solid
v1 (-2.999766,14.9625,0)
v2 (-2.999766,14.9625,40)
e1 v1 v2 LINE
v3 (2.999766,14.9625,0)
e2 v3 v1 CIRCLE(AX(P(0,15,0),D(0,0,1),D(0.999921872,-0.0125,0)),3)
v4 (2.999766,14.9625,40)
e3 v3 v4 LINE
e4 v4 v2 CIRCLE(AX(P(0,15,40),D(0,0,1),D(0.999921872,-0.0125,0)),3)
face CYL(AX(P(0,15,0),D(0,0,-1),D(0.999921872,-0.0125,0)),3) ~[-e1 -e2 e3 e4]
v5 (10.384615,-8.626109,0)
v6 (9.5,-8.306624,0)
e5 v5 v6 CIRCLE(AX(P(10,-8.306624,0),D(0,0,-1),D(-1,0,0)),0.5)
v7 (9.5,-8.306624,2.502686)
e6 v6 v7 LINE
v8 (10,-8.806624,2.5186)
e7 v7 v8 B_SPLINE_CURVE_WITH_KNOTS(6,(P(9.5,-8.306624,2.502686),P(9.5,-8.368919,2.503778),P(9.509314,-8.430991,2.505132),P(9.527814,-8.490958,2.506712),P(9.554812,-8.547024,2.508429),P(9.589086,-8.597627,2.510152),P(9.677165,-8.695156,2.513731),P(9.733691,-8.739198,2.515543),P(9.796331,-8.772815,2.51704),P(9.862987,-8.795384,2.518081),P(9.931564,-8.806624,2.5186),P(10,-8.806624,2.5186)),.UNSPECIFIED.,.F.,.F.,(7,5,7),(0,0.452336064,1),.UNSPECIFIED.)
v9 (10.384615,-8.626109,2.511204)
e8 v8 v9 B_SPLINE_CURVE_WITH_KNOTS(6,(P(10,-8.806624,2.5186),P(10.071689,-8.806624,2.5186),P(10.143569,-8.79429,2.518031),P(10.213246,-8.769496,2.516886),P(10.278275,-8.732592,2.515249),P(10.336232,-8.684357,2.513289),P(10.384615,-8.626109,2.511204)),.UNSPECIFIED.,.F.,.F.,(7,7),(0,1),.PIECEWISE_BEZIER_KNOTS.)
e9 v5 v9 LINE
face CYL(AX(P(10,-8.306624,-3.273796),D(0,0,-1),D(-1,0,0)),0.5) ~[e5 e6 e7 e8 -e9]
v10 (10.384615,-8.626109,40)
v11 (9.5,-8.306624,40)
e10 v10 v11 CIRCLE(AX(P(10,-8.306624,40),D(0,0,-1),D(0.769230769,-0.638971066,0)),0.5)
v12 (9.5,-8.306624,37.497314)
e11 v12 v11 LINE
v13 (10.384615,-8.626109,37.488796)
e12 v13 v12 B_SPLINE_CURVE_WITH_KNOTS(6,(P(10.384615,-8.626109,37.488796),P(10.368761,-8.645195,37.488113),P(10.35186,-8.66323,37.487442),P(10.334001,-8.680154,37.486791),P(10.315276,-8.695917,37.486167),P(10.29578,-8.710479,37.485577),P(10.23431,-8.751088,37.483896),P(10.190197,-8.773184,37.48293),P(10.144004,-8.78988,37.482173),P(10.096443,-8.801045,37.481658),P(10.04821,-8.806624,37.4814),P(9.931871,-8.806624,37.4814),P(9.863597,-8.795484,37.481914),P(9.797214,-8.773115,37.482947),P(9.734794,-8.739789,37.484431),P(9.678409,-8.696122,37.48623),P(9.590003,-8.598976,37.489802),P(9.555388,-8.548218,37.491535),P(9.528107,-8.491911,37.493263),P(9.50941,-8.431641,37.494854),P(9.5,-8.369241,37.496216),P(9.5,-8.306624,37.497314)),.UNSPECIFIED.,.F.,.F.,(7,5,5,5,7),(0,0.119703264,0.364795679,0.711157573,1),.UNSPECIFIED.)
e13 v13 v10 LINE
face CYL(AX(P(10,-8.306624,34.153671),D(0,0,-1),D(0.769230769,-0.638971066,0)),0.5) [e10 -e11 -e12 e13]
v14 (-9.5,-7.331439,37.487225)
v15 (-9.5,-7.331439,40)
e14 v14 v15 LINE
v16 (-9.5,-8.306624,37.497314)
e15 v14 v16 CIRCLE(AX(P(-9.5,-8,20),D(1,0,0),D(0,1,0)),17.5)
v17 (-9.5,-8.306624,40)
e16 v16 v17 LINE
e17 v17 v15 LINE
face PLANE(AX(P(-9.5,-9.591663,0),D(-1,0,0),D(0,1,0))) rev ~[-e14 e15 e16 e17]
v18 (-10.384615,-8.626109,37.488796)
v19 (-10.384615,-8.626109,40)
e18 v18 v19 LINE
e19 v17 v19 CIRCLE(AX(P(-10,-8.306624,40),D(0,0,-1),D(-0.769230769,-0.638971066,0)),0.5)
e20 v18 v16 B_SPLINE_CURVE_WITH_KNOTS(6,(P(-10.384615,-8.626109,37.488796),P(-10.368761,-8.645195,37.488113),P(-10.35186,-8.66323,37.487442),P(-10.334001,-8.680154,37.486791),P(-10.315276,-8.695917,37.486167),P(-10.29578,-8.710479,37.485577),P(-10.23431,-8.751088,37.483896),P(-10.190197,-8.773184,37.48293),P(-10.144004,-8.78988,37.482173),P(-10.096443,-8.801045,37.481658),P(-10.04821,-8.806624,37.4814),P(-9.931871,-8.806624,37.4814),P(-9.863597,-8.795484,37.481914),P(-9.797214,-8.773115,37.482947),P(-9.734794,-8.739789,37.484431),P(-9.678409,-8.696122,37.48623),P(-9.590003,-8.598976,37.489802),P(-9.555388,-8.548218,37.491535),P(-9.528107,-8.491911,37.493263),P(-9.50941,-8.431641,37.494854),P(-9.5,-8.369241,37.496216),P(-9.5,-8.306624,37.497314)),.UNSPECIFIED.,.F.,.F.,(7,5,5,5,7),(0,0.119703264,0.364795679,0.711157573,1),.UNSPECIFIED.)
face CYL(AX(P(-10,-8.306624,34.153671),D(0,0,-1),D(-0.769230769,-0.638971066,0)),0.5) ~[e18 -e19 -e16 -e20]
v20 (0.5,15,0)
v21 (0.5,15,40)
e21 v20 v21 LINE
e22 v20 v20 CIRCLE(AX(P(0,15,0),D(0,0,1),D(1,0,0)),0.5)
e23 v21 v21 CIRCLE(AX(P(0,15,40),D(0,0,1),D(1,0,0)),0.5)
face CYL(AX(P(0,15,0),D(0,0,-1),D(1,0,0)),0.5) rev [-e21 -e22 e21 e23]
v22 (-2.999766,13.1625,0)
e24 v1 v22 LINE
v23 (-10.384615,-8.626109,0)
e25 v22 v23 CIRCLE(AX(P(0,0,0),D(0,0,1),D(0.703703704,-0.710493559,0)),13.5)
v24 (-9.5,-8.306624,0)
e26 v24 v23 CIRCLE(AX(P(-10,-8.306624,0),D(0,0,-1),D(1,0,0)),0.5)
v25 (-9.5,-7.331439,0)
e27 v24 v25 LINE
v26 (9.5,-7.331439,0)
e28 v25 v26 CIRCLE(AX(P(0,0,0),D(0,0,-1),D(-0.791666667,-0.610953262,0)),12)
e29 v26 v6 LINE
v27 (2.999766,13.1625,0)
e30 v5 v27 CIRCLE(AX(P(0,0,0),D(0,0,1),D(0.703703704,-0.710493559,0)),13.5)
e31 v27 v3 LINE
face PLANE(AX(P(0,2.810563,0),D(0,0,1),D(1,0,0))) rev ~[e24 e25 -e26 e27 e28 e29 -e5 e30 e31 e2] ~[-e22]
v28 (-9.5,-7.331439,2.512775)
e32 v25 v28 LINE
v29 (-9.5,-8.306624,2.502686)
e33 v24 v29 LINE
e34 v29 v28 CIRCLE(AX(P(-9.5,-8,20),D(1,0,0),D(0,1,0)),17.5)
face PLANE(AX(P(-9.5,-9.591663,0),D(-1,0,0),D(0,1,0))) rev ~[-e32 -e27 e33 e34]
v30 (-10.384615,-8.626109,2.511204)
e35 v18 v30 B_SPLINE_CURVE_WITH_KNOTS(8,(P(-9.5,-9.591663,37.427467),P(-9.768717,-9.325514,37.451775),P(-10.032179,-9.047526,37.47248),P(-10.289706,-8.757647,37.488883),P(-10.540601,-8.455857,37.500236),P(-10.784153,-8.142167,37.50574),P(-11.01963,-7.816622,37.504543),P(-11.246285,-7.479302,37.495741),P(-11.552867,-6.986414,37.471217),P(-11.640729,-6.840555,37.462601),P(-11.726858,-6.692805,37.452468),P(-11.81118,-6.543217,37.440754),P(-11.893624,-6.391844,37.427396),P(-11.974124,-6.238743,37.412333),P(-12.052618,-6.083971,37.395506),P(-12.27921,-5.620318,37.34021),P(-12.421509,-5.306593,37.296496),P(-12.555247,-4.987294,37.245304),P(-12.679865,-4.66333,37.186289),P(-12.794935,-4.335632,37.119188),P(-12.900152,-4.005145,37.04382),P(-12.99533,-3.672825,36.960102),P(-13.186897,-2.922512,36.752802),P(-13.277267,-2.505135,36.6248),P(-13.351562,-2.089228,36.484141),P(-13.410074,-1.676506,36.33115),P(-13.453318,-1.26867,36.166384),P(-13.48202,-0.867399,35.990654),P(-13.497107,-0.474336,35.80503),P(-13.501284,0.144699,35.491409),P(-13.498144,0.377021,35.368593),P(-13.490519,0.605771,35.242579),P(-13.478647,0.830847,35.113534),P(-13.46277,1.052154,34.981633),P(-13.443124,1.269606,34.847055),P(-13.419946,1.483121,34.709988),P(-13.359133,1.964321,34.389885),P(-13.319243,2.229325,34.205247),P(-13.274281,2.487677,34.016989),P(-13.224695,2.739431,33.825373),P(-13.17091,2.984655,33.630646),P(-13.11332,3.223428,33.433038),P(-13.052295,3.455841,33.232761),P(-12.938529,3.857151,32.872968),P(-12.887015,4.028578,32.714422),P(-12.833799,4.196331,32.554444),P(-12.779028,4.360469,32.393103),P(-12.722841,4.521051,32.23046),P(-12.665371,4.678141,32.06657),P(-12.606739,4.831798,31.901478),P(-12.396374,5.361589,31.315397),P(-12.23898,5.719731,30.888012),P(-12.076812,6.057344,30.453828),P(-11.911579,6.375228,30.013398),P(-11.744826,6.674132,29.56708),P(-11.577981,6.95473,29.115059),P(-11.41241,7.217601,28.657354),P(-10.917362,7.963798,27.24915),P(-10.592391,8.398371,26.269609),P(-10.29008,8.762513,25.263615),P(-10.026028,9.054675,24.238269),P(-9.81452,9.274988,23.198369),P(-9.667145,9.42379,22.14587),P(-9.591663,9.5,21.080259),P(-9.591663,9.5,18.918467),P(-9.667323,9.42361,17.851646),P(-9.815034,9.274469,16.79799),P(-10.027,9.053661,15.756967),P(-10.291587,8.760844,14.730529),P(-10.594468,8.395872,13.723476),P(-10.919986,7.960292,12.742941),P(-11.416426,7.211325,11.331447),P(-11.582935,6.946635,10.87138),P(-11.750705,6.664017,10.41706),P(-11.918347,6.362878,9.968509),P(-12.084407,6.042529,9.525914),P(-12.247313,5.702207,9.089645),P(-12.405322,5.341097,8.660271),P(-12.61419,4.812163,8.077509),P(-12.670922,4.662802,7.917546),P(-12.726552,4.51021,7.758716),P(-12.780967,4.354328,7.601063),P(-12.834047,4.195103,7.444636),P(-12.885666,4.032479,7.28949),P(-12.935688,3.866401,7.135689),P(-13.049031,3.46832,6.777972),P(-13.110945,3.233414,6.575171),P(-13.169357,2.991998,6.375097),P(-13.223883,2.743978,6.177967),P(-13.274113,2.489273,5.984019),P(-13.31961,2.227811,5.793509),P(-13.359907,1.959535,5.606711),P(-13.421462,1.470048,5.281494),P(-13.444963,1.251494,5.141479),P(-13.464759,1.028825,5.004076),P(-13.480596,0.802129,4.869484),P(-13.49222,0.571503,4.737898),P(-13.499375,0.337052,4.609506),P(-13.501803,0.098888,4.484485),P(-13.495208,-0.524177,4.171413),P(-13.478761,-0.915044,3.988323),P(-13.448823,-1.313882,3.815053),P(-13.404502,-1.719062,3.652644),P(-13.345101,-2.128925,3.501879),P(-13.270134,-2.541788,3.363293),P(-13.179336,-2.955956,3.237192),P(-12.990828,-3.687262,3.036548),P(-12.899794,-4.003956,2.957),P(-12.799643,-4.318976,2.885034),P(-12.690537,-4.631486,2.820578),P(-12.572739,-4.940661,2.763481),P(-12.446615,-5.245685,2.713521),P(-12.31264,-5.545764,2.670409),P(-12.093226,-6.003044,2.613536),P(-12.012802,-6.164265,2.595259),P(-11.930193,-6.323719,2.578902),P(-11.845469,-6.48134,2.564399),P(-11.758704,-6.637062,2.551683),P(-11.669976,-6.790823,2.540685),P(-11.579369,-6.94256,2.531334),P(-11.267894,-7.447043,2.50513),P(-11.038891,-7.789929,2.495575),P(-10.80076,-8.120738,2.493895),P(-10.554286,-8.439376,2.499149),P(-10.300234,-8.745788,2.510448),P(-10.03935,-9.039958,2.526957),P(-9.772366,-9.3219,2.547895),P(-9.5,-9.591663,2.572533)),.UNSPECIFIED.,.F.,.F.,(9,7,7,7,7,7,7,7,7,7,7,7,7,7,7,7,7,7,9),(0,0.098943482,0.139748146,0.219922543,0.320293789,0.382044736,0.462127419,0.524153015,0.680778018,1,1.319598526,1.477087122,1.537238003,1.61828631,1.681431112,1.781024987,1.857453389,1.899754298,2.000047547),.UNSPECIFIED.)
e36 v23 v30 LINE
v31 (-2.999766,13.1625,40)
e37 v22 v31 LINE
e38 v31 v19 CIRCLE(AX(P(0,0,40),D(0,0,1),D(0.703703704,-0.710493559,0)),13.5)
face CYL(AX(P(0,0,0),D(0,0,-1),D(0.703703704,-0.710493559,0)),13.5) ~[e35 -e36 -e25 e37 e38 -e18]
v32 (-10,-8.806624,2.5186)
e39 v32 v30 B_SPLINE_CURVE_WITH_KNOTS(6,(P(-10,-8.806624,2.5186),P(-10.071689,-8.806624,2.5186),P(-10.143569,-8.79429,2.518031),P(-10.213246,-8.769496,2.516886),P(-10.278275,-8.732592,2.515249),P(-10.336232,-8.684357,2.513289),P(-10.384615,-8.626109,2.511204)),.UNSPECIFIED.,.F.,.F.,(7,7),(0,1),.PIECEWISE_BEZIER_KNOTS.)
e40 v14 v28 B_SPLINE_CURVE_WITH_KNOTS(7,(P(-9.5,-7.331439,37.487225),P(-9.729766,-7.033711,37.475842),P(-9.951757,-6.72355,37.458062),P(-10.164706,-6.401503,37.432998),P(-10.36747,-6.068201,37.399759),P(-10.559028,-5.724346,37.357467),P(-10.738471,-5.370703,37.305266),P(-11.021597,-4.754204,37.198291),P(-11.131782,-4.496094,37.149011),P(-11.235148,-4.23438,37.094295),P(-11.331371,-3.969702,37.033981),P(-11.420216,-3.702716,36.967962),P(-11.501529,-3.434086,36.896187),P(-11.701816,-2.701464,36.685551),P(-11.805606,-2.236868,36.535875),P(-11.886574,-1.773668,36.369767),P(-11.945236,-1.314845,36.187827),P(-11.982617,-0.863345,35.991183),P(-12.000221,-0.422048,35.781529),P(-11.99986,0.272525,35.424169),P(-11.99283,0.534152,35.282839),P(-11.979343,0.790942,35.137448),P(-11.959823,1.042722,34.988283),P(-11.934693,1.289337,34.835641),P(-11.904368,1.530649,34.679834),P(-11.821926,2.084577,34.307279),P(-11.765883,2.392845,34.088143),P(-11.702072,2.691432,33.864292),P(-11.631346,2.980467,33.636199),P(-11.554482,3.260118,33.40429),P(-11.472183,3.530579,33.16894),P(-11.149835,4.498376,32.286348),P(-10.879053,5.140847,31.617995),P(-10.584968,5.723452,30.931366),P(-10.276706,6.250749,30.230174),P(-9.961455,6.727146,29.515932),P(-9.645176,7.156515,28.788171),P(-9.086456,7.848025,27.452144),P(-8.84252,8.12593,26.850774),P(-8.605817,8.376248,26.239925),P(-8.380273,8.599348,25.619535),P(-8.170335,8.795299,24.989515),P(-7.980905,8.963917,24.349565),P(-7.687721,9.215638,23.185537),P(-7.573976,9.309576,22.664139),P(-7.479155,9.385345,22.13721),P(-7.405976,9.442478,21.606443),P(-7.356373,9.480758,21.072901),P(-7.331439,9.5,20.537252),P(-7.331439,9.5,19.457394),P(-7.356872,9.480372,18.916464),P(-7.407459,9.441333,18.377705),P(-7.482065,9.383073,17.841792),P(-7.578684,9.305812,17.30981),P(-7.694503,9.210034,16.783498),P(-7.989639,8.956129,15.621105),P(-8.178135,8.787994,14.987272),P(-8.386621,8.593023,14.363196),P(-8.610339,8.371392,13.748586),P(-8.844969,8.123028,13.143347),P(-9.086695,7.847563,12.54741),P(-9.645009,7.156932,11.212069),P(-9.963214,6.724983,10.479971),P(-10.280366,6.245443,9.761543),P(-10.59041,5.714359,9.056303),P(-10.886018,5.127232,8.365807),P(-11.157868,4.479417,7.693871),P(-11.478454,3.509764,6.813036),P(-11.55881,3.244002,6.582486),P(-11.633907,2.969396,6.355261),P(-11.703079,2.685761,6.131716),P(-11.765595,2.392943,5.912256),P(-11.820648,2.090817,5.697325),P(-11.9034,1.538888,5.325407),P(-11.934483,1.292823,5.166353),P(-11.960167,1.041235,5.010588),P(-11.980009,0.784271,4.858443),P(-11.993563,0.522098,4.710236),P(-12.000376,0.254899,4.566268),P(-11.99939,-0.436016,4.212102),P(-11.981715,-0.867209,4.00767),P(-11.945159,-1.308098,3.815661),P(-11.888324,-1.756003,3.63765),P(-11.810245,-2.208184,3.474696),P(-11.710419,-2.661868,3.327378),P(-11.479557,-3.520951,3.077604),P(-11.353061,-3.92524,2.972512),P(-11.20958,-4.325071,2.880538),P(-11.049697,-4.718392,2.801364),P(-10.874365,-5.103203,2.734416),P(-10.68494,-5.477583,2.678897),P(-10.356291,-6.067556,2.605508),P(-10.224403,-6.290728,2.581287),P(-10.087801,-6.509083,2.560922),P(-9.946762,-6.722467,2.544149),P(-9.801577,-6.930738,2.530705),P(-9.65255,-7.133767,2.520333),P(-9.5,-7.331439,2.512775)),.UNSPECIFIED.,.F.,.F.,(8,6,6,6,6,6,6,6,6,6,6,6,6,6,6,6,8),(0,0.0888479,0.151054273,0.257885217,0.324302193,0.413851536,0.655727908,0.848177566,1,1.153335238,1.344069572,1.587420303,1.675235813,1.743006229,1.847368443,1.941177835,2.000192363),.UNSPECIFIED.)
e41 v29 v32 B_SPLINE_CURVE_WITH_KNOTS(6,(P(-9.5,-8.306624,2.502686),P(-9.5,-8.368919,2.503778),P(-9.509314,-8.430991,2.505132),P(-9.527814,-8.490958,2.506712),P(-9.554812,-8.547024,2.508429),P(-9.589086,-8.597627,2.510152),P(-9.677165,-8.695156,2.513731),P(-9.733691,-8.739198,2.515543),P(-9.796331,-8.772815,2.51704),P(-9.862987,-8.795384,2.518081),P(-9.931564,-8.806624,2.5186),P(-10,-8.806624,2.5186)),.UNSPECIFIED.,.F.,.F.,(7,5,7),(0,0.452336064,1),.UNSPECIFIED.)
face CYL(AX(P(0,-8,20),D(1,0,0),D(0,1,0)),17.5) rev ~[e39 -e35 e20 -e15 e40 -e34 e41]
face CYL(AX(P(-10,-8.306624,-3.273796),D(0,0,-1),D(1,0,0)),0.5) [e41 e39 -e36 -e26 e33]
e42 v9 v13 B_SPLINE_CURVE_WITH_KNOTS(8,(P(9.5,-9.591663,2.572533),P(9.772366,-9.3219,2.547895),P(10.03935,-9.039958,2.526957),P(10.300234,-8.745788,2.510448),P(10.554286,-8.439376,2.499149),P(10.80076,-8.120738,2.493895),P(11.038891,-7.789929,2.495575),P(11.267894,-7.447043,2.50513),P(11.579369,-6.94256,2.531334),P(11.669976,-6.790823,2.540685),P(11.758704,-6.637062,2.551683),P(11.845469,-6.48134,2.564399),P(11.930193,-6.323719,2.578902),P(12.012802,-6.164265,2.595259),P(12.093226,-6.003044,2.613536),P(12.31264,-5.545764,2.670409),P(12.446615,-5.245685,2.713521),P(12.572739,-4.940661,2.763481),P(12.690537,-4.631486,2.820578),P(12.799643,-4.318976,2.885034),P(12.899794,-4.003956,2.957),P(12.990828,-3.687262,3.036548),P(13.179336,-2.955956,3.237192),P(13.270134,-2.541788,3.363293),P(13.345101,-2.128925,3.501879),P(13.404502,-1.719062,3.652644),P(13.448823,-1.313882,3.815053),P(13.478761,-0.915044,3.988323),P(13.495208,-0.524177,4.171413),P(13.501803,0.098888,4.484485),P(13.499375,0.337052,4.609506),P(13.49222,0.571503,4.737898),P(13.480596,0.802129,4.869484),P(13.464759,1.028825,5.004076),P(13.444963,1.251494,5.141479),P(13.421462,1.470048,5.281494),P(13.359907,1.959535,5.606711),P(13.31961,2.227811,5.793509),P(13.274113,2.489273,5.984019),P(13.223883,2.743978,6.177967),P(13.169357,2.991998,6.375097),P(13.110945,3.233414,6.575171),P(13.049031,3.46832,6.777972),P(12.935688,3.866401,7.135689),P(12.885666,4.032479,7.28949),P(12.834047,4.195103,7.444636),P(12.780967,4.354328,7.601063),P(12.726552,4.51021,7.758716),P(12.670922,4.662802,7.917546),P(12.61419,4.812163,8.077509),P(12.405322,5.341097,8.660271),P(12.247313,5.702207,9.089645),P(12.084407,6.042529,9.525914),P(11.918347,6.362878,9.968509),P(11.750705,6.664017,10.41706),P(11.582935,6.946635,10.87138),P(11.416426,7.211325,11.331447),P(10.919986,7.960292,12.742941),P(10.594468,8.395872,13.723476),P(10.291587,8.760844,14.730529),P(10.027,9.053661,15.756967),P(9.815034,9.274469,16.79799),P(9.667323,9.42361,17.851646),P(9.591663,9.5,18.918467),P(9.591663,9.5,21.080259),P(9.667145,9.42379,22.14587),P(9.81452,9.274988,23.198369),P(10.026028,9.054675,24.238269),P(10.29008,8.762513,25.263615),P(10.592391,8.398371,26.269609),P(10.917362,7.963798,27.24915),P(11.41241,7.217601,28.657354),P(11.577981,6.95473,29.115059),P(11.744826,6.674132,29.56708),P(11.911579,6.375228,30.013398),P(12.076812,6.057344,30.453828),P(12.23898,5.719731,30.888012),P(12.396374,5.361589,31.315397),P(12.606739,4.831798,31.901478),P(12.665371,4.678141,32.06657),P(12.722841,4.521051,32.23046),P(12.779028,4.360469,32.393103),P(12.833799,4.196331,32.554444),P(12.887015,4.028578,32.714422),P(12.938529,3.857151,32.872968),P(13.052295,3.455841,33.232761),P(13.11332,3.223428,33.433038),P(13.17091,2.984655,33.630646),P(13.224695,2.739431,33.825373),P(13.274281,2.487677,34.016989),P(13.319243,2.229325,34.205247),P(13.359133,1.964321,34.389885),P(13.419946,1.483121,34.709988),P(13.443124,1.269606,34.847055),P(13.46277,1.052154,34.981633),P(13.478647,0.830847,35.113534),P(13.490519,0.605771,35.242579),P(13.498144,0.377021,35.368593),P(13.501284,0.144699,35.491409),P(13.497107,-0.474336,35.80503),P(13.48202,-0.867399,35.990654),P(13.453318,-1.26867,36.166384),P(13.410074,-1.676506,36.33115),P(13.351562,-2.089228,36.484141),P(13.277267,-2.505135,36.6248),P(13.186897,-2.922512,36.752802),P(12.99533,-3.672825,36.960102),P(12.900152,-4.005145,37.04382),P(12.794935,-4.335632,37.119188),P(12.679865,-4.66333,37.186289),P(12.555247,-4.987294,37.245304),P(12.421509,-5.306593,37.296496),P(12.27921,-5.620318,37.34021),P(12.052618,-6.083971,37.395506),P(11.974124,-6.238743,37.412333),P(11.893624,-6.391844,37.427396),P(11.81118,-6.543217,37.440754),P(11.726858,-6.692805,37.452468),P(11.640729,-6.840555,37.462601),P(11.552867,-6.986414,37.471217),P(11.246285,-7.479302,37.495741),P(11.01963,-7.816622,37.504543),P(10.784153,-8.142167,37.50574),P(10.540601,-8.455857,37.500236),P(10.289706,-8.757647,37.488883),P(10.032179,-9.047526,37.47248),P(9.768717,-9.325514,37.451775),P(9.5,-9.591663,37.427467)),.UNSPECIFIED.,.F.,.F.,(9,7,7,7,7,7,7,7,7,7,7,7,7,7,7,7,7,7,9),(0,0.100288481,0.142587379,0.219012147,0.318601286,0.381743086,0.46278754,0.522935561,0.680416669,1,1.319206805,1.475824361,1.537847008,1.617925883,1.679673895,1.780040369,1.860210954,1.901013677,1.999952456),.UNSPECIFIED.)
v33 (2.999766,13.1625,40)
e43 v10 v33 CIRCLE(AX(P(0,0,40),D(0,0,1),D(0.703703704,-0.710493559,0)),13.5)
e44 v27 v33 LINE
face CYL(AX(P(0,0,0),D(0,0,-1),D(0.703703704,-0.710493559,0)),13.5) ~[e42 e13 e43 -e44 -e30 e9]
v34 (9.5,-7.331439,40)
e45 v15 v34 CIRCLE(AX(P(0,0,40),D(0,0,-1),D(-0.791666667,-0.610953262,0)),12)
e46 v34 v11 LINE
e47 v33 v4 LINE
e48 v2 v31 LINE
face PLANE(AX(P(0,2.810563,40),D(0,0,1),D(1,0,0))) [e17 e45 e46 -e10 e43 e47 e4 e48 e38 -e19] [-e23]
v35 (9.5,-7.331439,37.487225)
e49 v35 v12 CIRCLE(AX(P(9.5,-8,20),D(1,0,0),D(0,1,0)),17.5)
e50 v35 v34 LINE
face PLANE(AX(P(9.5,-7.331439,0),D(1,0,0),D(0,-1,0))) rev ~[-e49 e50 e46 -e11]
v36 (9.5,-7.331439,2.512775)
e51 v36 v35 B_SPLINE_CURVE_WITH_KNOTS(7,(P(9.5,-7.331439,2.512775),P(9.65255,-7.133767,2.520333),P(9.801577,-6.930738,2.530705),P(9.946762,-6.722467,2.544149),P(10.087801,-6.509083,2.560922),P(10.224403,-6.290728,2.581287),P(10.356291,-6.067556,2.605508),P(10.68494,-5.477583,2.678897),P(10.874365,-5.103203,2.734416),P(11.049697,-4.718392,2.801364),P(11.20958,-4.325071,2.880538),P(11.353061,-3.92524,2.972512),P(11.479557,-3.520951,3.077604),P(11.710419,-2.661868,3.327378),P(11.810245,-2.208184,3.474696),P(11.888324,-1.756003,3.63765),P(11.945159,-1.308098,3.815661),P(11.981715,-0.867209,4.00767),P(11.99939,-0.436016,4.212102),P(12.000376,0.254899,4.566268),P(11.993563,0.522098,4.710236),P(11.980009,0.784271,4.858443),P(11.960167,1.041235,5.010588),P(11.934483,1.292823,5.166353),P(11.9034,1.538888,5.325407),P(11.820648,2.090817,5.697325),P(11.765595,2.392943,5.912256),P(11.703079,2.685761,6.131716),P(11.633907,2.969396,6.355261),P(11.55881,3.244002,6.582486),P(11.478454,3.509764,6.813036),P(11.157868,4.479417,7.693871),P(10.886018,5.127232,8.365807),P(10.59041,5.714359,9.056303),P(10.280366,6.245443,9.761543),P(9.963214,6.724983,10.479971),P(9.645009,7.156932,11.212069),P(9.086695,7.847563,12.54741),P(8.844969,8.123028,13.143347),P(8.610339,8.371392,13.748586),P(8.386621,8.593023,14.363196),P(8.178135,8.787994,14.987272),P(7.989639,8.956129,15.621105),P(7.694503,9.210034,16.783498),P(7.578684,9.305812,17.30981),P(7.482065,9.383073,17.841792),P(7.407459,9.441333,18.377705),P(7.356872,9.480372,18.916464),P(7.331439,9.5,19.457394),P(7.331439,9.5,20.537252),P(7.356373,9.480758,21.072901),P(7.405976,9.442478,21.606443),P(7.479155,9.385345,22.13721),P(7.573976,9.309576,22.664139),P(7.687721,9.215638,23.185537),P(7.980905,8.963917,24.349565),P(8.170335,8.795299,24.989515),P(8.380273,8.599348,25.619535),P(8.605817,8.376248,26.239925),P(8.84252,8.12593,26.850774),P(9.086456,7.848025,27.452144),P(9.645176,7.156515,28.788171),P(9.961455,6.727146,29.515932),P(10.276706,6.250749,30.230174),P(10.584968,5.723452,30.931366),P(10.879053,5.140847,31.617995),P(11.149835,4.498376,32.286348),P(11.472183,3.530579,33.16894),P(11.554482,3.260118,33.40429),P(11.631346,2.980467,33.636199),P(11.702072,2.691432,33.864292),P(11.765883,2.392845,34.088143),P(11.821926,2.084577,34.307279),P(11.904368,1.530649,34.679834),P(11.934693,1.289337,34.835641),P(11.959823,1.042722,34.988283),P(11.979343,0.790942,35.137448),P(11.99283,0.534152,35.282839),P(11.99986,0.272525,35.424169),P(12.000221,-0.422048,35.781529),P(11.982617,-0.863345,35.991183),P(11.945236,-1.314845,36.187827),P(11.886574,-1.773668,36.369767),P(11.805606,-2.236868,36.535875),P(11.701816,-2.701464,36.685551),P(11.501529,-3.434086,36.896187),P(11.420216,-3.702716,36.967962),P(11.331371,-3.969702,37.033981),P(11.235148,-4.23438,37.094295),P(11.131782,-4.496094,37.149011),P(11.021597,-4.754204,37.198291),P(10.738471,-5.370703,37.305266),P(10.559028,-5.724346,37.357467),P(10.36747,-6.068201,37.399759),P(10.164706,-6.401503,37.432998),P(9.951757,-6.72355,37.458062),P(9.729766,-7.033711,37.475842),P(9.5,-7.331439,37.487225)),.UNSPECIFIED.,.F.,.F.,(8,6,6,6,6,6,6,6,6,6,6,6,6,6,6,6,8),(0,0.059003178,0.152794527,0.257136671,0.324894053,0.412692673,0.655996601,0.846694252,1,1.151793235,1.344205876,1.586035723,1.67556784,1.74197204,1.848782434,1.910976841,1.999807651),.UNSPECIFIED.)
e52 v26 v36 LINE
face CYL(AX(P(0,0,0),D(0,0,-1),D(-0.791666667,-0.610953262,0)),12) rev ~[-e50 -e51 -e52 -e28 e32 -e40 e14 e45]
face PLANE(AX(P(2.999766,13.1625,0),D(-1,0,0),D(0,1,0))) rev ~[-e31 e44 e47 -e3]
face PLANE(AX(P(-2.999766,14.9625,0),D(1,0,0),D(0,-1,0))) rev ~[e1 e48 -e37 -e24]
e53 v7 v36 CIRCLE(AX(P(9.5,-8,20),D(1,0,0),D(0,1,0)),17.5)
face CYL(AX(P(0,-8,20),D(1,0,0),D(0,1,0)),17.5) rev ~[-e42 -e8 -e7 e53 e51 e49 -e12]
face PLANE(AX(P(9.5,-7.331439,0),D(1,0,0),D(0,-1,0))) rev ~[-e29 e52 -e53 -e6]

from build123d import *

# Parameters (mm, degrees)
F1_DEPTH    = 40
F2_R        = 17.5
F3_DEPTH    = 15
F5_R        = 0.5
F6_DEPTH    = 40
F7_T1_DEPTH = 9.1201245228
F7_T3_DEPTH = 9.1201245228


# Not quite as in the source:
# - a fillet or chamfer that OpenCascade refuses, or shapes differently, is made with other operations: its cross-section is extruded or revolved along the edge and cut away or added


with BuildPart() as f1:
    # F0 (on Top) → F1 (new body)
    with BuildSketch(Plane.XY):
        with BuildLine():
            ThreePointArc((-9.5, -7.3314391493), (0, 12), (9.5, -7.3314391493))
            Line((9.5, -7.3314391493), (9.5, -9.5916630466))
            ThreePointArc((9.5, -9.5916630466), (0, 13.5), (-9.5, -9.5916630466))
            Line((-9.5, -9.5916630466), (-9.5, -7.3314391493))
        make_face()
    extrude(amount=F1_DEPTH)


with BuildPart() as f3:
    # F2 (on Right) → F3 (new body, symmetric)
    with BuildSketch(Plane.YZ):
        with Locations((-8, 20)):
            Circle(F2_R)
    extrude(amount=F3_DEPTH, both=True)


with BuildPart() as f1_1:
    add(f1.part)

    # F4: cut F3
    add(f3.part, mode=Mode.SUBTRACT)

    # F5 (on Top) → F6 (join)
    with BuildSketch(Plane.XY):
        with BuildLine():
            Line((2.9997656158, 13.1625), (2.9997656158, 14.9625))
            ThreePointArc((2.9997656158, 14.9625), (0, 18), (-2.9997656158, 14.9625))
            Line((-2.9997656158, 14.9625), (-2.9997656158, 13.1625))
            ThreePointArc((-2.9997656158, 13.1625), (0, 13.5), (2.9997656158, 13.1625))
        make_face()
        with Locations((0, 15)):
            Circle(F5_R, mode=Mode.SUBTRACT)
    extrude(amount=F6_DEPTH)

    # F7: fillet of radius 0.5 on 4 edges, made by hand

    # F7_s2 → F7_t1 (cut)
    with BuildSketch(Plane.XY.offset(34.1536712775)):
        with BuildLine():
            ThreePointArc((-10.3846153846, -8.6261093961), (-9.8301584449, -8.7768938345), (-9.5, -8.3066238629))
            Line((-9.5, -8.3066238629), (-9.5, -9.5916630466))
            ThreePointArc((-9.5, -9.5916630466), (-9.9540220872, -9.1196186482), (-10.3846153846, -8.6261093961))
        make_face()
        with BuildLine():
            ThreePointArc((10.3846153846, -8.6261093961), (9.8301584449, -8.7768938345), (9.5, -8.3066238629))
            Line((9.5, -8.3066238629), (9.5, -9.5916630466))
            ThreePointArc((9.5, -9.5916630466), (9.9540220872, -9.1196186482), (10.3846153846, -8.6261093961))
        make_face()
    extrude(amount=F7_T1_DEPTH, mode=Mode.SUBTRACT)

    # F7_s4 → F7_t3 (cut)
    with BuildSketch(Plane.XY.offset(-3.2737958003)):
        with BuildLine():
            ThreePointArc((9.5, -8.3066238629), (9.8301584449, -8.7768938345), (10.3846153846, -8.6261093961))
            ThreePointArc((10.3846153846, -8.6261093961), (9.9540220872, -9.1196186482), (9.5, -9.5916630466))
            Line((9.5, -9.5916630466), (9.5, -8.3066238629))
        make_face()
        with BuildLine():
            ThreePointArc((-9.5, -8.3066238629), (-9.8301584449, -8.7768938345), (-10.3846153846, -8.6261093961))
            ThreePointArc((-10.3846153846, -8.6261093961), (-9.9540220872, -9.1196186482), (-9.5, -9.5916630466))
            Line((-9.5, -9.5916630466), (-9.5, -8.3066238629))
        make_face()
    extrude(amount=F7_T3_DEPTH, mode=Mode.SUBTRACT)


solid = f1_1.part
